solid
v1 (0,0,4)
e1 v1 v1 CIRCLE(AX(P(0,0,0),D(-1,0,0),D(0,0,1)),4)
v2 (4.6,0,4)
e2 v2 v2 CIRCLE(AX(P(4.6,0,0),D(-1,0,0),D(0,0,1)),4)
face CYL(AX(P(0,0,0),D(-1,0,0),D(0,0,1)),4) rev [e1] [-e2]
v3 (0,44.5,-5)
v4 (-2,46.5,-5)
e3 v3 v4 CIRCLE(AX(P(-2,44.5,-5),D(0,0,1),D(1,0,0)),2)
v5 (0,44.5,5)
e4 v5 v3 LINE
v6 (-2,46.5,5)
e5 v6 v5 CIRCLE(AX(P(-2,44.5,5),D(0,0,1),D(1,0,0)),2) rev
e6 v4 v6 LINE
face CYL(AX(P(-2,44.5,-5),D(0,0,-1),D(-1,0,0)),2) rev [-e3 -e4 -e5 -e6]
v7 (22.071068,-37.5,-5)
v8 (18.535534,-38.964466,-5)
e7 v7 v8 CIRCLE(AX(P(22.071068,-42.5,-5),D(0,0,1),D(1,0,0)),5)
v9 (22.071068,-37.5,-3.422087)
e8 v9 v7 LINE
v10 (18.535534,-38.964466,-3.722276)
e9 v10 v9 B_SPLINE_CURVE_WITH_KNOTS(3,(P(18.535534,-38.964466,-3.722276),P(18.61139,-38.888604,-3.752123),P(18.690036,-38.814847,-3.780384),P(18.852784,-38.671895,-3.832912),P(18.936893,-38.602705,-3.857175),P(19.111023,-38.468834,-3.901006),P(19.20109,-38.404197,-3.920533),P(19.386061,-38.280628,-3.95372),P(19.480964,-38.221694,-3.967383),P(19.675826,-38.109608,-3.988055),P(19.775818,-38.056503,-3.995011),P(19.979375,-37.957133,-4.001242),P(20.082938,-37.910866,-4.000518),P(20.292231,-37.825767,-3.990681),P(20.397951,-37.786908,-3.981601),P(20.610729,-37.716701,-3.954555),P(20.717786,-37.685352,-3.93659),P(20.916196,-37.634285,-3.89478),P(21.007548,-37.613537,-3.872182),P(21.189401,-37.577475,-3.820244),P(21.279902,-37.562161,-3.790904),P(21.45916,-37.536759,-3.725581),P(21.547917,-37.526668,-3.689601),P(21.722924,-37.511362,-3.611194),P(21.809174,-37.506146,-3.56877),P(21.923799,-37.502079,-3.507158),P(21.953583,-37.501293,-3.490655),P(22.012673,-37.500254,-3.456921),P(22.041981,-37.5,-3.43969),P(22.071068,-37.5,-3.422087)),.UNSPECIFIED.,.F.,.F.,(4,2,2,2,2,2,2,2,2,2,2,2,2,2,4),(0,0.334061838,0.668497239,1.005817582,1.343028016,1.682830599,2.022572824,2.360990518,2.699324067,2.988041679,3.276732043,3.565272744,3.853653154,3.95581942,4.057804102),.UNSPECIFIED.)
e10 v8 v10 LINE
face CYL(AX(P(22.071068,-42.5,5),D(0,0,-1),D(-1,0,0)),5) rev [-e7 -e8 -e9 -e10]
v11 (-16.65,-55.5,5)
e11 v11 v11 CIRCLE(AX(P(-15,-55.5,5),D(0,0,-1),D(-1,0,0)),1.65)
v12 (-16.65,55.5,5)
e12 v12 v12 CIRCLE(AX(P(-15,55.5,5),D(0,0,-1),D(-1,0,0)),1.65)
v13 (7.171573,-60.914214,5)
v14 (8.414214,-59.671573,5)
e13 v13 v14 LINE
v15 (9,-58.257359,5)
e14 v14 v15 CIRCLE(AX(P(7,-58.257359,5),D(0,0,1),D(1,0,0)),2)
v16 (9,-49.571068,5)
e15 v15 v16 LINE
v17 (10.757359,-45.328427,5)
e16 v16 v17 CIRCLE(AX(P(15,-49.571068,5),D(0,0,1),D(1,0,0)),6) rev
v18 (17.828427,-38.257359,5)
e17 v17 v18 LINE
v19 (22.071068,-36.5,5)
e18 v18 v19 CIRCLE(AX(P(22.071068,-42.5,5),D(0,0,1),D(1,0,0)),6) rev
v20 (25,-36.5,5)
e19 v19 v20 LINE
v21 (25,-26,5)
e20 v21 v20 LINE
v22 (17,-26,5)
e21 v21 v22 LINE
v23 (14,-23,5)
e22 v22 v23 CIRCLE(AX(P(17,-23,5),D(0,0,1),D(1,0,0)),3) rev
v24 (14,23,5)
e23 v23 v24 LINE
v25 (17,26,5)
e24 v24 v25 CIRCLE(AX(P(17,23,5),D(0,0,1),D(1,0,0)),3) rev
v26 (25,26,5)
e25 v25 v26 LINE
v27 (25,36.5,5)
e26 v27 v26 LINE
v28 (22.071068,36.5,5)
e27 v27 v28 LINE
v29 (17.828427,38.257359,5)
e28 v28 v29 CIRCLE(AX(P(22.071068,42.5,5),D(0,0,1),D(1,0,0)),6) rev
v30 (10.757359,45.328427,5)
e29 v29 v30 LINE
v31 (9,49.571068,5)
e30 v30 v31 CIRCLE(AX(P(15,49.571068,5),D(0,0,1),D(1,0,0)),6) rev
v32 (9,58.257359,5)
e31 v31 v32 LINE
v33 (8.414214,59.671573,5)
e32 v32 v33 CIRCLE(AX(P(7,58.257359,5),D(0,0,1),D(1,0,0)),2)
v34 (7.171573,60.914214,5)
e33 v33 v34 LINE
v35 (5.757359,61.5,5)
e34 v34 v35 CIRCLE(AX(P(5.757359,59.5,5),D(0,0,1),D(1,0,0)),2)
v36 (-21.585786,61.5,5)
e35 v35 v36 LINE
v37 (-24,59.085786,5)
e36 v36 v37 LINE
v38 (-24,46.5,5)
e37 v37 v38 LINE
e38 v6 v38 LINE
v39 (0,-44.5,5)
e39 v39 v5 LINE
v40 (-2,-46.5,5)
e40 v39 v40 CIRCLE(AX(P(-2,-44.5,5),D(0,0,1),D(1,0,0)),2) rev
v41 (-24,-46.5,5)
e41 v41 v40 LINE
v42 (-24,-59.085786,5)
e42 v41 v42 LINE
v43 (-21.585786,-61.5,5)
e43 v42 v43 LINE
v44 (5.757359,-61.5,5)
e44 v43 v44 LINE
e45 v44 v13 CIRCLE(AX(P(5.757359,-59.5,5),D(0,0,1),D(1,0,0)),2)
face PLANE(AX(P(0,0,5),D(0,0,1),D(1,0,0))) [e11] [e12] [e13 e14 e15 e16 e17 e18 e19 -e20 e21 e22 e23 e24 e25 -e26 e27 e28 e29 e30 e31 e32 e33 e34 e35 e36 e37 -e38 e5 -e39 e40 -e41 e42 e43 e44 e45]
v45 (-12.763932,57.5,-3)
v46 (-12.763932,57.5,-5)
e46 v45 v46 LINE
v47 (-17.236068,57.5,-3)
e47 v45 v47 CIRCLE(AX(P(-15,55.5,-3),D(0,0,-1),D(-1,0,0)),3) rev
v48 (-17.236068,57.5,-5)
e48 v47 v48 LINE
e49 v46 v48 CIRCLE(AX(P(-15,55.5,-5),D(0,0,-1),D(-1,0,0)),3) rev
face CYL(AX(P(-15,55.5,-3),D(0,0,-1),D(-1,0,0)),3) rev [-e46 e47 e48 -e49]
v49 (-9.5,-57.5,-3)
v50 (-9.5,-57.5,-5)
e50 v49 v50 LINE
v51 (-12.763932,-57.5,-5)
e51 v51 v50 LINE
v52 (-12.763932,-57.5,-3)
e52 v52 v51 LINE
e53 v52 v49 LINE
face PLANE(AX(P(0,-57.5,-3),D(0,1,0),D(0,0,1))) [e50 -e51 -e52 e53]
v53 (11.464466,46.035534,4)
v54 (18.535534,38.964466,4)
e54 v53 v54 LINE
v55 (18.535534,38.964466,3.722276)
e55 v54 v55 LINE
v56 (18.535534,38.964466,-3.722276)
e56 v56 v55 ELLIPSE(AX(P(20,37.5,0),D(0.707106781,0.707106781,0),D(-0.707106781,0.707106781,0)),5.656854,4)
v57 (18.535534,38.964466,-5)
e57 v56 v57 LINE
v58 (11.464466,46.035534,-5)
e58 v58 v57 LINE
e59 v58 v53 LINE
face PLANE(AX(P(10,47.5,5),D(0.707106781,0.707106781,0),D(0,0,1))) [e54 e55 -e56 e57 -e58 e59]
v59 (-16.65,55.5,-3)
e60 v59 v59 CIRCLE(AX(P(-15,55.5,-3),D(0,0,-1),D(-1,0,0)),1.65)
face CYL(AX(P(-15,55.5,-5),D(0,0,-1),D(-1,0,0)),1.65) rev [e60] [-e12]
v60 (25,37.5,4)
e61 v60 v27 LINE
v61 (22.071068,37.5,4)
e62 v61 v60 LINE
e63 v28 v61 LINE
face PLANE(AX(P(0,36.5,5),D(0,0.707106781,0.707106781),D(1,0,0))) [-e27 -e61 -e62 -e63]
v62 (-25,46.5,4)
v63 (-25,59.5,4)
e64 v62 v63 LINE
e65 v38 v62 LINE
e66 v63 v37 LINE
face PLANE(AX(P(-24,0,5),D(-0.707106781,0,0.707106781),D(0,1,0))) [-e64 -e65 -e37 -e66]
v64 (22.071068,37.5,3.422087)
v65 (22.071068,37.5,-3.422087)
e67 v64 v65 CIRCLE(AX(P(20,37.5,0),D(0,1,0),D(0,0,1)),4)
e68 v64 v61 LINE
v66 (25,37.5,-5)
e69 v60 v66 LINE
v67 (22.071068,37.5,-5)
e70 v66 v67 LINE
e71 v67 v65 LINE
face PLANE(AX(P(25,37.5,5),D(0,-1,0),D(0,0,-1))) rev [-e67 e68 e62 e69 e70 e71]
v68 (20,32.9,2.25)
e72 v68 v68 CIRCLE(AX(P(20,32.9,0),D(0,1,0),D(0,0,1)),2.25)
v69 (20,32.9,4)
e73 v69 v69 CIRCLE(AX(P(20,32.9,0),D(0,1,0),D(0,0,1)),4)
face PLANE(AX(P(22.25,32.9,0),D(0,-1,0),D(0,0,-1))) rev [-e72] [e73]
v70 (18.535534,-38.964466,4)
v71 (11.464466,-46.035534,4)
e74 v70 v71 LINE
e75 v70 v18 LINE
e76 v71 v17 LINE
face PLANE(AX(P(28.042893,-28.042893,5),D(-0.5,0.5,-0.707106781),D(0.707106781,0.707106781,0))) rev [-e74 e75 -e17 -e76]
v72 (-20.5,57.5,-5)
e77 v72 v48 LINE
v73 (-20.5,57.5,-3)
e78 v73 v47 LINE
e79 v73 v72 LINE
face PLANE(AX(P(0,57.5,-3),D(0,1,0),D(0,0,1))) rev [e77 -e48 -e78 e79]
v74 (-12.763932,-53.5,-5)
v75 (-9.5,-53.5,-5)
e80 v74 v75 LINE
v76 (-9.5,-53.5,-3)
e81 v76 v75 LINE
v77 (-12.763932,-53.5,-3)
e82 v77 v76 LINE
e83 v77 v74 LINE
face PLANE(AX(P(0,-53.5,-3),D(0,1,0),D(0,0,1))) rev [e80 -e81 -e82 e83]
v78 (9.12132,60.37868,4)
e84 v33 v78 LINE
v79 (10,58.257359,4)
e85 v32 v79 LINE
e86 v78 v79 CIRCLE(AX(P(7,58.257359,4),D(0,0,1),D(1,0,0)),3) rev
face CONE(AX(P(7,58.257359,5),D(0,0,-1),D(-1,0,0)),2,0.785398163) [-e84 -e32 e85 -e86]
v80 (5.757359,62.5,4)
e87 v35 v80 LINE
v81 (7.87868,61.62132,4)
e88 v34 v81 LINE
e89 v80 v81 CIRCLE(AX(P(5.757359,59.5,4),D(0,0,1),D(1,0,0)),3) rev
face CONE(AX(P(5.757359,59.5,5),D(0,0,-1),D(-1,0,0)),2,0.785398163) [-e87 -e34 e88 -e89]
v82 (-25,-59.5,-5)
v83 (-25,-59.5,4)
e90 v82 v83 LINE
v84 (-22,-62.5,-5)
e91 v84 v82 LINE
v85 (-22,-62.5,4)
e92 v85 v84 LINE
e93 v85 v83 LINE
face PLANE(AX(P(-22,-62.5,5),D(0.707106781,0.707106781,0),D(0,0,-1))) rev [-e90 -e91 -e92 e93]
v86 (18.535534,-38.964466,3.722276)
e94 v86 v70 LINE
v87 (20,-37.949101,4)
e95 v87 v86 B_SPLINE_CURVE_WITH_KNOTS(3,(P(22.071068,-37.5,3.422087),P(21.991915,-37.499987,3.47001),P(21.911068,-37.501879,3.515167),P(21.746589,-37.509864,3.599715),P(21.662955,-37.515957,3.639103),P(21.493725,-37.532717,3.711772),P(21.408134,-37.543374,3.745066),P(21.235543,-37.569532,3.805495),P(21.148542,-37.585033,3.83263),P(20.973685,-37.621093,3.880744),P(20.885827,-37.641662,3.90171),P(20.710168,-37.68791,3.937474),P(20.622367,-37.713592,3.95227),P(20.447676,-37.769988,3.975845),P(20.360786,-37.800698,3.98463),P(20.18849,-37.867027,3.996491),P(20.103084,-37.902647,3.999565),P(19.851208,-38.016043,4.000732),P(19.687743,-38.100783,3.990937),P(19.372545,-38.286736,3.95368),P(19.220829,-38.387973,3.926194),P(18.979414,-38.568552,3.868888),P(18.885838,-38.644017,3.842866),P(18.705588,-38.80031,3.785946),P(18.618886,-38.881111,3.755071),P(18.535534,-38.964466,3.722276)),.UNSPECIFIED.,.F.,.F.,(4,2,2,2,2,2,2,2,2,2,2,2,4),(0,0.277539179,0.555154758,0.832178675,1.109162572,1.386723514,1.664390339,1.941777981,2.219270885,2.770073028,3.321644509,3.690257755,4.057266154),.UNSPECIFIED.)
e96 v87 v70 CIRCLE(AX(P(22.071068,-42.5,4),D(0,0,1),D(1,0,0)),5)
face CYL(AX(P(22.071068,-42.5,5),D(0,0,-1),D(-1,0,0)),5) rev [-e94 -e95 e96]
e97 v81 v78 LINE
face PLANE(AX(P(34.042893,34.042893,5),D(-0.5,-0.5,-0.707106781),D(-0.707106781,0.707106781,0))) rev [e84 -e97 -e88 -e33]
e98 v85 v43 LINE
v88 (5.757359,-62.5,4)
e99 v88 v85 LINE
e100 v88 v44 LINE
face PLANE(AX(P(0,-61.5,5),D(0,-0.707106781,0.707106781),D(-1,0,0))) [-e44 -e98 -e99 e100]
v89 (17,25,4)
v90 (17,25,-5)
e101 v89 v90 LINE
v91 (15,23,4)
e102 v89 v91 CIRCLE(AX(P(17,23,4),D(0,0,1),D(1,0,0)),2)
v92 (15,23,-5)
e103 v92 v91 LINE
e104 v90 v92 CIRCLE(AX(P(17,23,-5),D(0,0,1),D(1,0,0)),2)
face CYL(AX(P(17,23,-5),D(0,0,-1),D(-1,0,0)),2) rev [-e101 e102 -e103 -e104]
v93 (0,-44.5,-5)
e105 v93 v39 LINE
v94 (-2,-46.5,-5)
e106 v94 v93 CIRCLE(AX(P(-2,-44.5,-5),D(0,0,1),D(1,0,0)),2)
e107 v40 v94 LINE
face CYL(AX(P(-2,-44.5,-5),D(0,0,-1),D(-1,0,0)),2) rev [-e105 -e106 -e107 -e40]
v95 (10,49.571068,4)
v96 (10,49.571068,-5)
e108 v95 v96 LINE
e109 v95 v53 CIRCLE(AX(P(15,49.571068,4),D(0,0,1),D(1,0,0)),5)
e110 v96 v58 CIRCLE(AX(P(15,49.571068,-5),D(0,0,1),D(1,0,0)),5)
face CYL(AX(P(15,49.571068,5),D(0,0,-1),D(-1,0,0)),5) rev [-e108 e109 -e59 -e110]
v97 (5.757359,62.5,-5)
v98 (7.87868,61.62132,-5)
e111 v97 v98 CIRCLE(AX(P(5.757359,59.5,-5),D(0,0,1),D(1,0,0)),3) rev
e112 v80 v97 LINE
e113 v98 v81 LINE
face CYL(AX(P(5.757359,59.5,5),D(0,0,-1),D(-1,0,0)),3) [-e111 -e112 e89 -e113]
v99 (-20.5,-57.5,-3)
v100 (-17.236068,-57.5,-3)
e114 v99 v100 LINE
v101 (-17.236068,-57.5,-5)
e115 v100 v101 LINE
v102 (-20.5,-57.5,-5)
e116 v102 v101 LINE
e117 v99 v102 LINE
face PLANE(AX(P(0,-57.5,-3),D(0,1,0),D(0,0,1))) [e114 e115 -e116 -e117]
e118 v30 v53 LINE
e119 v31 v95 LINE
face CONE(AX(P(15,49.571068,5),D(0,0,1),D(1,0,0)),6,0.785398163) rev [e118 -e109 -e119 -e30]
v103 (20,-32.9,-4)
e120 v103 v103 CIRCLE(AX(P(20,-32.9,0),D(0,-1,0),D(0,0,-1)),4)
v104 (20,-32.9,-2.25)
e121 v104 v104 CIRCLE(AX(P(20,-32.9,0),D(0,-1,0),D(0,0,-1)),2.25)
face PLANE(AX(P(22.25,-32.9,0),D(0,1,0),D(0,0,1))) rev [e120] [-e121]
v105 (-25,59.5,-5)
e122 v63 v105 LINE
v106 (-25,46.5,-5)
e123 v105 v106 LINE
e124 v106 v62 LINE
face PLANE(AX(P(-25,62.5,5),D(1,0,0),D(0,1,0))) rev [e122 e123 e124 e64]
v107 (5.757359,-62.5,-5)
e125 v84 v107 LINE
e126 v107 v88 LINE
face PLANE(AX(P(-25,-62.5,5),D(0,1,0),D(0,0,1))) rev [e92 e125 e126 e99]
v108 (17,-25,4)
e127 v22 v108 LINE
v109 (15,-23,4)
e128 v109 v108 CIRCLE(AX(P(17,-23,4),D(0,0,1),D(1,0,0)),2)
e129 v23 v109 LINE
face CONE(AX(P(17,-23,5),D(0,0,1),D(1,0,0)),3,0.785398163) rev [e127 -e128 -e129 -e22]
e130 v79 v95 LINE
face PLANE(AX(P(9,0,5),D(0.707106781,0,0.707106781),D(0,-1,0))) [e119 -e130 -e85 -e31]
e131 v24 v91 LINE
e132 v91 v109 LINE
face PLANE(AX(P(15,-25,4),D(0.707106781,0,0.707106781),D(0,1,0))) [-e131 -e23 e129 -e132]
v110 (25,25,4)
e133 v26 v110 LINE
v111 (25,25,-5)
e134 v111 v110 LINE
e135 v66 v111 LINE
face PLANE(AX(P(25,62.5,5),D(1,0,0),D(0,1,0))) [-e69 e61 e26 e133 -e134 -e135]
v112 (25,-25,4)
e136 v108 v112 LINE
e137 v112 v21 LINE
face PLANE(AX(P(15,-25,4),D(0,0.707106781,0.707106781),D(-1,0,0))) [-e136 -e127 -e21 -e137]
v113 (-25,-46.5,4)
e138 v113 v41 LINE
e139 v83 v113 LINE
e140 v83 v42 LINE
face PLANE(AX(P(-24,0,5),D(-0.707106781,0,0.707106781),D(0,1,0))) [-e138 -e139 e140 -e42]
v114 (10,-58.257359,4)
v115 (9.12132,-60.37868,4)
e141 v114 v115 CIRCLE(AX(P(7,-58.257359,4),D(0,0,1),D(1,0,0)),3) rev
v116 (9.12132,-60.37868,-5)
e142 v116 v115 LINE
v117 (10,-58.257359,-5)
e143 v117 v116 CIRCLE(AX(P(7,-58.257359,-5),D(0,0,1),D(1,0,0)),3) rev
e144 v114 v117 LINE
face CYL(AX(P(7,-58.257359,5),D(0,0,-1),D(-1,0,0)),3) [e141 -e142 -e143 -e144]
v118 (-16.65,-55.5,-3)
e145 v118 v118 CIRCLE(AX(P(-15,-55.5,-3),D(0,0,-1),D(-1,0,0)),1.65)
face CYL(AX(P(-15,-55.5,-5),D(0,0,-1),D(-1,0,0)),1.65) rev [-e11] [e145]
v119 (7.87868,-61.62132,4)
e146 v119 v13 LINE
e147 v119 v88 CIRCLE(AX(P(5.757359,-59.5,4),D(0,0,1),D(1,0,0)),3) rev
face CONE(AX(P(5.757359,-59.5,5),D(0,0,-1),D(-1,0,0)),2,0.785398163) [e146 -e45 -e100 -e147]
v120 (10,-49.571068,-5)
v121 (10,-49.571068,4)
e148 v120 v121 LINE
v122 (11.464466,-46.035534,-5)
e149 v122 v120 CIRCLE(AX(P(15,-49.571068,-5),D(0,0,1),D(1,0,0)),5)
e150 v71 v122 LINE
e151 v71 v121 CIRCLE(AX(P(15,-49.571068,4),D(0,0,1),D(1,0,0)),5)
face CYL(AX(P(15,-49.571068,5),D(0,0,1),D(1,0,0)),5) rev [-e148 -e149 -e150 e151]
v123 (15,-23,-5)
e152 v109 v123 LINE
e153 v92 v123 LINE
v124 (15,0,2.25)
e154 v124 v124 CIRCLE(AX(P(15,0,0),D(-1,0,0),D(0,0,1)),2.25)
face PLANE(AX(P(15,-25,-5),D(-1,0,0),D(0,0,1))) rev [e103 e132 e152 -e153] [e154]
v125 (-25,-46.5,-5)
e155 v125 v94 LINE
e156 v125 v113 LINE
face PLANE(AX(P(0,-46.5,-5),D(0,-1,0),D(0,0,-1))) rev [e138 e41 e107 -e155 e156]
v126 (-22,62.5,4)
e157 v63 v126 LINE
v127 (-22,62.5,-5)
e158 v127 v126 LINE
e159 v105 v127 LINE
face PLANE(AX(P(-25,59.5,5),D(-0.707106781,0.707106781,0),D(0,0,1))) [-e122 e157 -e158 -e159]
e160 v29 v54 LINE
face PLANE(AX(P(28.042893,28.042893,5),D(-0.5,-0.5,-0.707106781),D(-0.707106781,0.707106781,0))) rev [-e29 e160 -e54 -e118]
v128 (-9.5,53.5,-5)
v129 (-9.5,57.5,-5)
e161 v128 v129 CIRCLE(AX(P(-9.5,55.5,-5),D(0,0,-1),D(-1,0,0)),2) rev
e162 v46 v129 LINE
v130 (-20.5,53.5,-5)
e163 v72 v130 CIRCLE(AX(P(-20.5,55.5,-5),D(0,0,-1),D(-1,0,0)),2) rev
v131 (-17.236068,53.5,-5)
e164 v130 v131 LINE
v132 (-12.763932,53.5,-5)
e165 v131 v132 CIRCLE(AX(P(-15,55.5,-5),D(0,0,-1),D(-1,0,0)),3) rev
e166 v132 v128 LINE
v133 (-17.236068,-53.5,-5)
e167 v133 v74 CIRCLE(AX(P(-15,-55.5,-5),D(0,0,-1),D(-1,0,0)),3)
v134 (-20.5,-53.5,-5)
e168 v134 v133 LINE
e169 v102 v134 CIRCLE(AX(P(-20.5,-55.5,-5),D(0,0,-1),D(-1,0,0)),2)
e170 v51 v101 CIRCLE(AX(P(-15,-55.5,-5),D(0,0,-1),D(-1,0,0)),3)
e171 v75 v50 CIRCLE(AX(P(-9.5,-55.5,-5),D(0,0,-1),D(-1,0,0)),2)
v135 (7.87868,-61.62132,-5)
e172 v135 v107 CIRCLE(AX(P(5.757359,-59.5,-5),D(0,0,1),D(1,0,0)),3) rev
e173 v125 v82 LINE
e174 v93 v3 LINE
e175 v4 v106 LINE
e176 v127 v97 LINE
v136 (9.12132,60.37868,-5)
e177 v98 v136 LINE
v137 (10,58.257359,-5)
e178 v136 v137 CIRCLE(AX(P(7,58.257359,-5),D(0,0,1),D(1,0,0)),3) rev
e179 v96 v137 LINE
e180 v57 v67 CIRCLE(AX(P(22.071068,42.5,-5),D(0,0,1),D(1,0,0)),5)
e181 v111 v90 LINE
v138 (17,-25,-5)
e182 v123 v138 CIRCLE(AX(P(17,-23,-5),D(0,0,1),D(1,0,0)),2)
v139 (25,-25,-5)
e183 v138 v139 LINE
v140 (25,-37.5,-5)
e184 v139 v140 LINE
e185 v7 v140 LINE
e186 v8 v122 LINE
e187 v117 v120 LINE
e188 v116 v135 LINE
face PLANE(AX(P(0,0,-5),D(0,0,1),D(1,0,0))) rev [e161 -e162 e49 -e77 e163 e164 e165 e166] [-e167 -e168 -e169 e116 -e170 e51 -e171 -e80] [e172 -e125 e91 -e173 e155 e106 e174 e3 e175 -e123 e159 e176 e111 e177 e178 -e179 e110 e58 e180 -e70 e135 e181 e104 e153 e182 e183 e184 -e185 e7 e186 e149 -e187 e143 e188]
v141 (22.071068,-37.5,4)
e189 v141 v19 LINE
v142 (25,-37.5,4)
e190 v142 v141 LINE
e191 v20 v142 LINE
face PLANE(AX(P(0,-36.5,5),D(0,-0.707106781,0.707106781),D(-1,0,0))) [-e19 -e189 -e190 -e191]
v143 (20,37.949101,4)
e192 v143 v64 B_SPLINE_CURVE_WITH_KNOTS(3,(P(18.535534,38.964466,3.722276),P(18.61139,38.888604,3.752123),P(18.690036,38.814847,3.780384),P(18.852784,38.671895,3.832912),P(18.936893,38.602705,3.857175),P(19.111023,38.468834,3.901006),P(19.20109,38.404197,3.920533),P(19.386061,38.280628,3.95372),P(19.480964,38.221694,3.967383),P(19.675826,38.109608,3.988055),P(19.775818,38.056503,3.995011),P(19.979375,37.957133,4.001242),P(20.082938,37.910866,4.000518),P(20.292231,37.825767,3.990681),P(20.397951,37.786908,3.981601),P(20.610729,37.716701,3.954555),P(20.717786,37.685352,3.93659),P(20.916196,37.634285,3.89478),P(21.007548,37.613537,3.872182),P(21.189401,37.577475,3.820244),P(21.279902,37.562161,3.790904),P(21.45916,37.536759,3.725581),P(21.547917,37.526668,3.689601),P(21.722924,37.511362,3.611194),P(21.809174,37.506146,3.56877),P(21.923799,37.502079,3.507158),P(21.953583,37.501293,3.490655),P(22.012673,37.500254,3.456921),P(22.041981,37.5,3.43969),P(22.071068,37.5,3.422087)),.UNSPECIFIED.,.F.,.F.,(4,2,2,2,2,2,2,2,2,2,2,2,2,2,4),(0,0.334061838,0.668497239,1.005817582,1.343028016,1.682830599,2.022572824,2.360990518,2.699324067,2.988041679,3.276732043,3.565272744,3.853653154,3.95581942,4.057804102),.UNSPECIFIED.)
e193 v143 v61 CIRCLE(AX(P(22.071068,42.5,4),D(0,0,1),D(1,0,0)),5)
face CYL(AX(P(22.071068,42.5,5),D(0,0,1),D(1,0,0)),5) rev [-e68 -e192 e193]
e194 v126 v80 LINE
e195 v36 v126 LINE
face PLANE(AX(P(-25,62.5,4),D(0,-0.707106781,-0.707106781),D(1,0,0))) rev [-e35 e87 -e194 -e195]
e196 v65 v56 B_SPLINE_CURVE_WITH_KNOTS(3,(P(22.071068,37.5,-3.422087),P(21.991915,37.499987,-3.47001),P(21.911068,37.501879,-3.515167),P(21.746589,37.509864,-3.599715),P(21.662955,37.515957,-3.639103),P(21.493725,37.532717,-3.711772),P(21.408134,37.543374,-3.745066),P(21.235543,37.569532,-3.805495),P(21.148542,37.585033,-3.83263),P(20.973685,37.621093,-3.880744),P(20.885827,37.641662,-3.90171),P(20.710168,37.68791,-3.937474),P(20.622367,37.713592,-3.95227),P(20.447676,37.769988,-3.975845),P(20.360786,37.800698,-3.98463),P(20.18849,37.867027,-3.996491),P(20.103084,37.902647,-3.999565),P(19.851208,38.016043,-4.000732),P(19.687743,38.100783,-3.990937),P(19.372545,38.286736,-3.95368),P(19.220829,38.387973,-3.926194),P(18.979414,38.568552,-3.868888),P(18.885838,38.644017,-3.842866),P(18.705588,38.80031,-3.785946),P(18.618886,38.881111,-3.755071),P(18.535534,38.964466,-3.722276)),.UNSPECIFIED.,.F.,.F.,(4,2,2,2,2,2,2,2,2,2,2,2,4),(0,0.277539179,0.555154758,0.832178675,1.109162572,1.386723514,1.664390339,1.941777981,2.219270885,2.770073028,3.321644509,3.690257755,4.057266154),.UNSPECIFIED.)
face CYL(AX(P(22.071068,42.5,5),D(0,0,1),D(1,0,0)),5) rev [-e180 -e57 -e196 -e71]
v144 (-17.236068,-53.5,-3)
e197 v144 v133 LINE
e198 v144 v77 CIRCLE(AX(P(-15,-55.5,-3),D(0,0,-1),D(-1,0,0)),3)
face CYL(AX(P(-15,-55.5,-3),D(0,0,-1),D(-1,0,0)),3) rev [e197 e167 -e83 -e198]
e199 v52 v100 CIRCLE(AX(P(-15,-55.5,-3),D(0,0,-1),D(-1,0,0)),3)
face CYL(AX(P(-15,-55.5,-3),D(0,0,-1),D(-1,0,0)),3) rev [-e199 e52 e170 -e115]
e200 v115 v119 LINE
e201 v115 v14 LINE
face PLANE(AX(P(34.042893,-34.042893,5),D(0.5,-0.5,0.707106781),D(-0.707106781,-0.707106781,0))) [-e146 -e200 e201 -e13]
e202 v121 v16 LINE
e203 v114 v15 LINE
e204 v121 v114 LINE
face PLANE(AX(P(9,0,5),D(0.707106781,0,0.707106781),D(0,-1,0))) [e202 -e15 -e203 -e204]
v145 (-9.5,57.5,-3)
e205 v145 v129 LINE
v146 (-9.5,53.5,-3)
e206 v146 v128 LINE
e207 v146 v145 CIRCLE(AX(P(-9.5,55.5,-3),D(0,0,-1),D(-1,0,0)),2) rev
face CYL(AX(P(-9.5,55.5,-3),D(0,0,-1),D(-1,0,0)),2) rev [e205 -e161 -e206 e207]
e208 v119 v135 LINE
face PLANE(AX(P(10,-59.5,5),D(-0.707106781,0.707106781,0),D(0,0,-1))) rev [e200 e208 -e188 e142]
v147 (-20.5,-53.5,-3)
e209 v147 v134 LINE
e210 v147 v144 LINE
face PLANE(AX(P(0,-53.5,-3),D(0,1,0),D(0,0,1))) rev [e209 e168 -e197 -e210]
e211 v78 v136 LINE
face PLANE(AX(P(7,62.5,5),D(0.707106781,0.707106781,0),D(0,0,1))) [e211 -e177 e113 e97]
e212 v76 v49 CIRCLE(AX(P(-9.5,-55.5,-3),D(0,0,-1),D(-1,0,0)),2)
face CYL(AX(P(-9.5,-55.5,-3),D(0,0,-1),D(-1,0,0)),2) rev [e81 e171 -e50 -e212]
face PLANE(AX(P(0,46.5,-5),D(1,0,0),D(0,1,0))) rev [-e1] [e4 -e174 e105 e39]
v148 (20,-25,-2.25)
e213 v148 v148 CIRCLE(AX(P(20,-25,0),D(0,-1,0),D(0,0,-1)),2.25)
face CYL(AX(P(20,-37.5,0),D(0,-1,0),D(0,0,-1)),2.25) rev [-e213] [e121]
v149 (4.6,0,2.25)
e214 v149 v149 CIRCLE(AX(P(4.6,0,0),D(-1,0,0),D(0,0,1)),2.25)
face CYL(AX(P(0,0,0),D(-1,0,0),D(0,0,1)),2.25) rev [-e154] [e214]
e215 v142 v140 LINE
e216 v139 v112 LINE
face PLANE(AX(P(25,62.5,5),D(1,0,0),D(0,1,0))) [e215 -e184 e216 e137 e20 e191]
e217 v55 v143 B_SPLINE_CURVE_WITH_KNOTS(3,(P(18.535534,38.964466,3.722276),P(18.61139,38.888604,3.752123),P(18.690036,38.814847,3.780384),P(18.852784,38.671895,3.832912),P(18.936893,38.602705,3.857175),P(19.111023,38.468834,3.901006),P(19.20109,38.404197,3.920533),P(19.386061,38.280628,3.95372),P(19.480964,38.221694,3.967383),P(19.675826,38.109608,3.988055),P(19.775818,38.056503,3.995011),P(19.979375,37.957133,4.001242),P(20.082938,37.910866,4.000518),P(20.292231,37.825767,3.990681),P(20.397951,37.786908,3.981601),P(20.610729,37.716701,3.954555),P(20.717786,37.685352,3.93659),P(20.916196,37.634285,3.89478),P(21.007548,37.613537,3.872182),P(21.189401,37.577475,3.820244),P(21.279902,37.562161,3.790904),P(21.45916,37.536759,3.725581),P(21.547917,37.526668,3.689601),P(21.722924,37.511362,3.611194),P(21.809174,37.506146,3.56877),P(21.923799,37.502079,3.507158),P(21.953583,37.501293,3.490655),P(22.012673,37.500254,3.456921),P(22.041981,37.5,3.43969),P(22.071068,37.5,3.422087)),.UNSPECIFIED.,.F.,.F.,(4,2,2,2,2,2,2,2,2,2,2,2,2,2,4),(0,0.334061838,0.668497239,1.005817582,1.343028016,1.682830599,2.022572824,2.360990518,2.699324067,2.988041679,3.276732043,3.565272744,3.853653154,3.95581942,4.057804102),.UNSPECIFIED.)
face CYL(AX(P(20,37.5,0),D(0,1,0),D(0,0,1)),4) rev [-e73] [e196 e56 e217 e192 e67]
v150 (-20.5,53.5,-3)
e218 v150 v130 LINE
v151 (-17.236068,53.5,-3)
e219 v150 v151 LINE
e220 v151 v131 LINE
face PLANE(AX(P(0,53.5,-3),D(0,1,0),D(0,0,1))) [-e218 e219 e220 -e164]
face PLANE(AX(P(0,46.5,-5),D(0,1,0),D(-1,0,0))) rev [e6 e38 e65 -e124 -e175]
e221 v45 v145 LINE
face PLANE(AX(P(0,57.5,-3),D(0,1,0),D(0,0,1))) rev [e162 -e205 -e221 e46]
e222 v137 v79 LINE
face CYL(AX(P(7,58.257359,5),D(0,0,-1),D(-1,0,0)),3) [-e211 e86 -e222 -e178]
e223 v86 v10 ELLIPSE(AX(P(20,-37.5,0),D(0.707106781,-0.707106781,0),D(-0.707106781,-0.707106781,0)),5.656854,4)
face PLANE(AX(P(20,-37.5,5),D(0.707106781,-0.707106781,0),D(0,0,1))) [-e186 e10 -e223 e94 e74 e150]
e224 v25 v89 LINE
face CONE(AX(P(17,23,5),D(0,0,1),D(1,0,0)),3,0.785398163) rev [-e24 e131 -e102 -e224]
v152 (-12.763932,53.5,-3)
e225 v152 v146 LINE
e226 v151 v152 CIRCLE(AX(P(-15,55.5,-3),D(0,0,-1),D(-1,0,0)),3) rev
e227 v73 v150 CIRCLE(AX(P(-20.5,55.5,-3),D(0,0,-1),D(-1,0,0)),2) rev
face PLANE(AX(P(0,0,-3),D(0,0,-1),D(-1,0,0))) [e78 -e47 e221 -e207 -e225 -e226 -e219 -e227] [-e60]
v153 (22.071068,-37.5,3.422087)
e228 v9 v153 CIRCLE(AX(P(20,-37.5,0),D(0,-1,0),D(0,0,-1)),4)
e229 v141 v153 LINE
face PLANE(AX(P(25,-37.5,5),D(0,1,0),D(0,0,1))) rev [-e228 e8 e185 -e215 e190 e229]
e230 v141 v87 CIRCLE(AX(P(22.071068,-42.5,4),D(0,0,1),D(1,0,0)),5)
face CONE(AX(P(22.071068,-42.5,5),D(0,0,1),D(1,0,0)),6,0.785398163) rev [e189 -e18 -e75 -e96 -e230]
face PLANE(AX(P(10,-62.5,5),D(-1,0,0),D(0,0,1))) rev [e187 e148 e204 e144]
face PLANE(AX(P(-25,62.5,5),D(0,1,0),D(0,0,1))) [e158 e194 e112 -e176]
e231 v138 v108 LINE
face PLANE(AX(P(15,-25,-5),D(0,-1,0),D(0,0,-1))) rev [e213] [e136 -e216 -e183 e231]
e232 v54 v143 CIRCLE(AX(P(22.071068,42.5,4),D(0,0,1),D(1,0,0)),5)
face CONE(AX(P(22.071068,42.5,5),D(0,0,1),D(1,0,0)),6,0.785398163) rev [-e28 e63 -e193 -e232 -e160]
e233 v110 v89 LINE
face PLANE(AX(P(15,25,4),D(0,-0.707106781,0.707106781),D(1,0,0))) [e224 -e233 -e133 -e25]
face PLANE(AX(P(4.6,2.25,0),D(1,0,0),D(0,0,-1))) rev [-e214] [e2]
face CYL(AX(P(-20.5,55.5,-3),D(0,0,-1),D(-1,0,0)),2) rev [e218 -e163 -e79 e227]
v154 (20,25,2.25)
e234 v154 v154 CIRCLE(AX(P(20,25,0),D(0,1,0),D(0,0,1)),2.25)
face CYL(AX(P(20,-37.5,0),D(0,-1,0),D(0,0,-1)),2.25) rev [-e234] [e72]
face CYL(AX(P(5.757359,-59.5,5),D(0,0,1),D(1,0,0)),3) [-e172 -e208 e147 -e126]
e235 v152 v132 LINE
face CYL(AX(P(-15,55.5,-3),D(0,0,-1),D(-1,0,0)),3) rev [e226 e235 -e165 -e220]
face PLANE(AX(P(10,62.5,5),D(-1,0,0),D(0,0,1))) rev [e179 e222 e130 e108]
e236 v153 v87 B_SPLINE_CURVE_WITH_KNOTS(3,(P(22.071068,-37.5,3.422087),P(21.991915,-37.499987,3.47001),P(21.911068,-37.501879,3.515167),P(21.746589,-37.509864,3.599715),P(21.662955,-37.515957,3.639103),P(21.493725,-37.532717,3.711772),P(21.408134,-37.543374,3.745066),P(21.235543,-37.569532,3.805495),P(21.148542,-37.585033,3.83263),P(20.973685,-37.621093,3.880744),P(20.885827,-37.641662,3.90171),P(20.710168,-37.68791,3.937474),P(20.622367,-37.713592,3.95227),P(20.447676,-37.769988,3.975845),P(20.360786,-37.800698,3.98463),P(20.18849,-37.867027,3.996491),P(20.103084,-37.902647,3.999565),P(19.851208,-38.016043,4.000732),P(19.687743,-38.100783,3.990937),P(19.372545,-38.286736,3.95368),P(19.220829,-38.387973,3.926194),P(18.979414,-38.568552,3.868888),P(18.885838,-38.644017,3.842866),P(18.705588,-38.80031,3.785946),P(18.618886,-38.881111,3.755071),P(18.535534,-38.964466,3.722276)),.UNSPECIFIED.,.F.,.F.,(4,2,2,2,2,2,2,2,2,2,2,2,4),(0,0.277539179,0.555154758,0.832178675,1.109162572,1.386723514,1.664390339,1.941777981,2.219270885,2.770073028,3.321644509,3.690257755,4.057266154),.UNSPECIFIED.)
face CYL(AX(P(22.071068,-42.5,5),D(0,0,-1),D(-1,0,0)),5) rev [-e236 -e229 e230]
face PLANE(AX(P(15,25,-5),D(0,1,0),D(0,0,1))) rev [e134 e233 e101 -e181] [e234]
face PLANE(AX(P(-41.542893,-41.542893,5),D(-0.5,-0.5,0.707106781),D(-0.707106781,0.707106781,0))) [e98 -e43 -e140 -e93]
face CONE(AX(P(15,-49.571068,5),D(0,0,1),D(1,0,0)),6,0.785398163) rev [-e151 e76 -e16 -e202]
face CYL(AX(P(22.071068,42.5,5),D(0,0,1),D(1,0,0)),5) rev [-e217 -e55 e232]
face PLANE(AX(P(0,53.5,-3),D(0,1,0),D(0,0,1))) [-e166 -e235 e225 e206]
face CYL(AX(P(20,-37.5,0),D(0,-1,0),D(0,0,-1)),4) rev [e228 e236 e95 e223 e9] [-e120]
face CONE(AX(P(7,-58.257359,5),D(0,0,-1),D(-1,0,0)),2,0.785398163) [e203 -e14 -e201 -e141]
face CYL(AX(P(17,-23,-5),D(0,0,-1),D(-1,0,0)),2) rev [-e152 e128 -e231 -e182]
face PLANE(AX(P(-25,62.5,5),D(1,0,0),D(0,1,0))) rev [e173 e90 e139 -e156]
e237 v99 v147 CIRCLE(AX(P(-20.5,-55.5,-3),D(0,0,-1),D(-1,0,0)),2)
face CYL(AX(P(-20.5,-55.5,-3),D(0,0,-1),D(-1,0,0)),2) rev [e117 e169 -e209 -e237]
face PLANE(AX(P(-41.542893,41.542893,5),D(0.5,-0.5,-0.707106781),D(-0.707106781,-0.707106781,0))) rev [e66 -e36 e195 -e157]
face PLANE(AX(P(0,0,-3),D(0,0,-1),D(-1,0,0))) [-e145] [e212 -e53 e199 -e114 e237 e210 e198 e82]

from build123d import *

# Parameters (mm, degrees)
SKETCH1_W                                            = 50
SKETCH1_H                                            = 125
BOSS_EXTRUDE1_DEPTH                                  = 5
SKETCH2_W                                            = 25
SKETCH2_H                                            = 93
CUT_EXTRUDE1_DEPTH                                   = 69.053287944
SKETCH3_W                                            = 10
SKETCH3_H                                            = 50
CUT_EXTRUDE2_DEPTH                                   = 69.053287944
CUT_EXTRUDE3_DEPTH                                   = 2
M4_TAPPED_HOLE1_D                                    = 3.3
SKETCH7_W                                            = 15
SKETCH7_H                                            = 25
CUT_EXTRUDE4_DEPTH                                   = 69.053287944
CBORE_FOR_M4_SLOTTED_CHEESE_HEAD_SCREWS2_D           = 4.5
CBORE_FOR_M4_SLOTTED_CHEESE_HEAD_SCREWS2_CBORE_D     = 8
CBORE_FOR_M4_SLOTTED_CHEESE_HEAD_SCREWS2_CBORE_DEPTH = 4.6
CBORE_FOR_M4_SLOTTED_CHEESE_HEAD_SCREWS3_D           = 4.5
CBORE_FOR_M4_SLOTTED_CHEESE_HEAD_SCREWS3_CBORE_D     = 8
CBORE_FOR_M4_SLOTTED_CHEESE_HEAD_SCREWS3_CBORE_DEPTH = 4.6
CHAMFER1_SIZE                                        = 10
FILLET1_R                                            = 5
FILLET2_R                                            = 2
CHAMFER2_SIZE                                        = 3
FILLET3_R                                            = 3
CHAMFER3_SIZE                                        = 1


# Some blends are built 0.0001 mm under size
with BuildPart() as part:
    # Sketch1 → Boss-Extrude1 (new, symmetric)
    with BuildSketch(Plane.XY):
        Rectangle(SKETCH1_W, SKETCH1_H)
    extrude(amount=BOSS_EXTRUDE1_DEPTH, both=True)

    # Sketch2 → Cut-Extrude1 (cut, through all)
    with BuildSketch(Plane.XY.offset(5)):
        with Locations((-12.5, 0)):
            Rectangle(SKETCH2_W, SKETCH2_H)
    extrude(amount=-CUT_EXTRUDE1_DEPTH, mode=Mode.SUBTRACT)

    # Sketch3 → Cut-Extrude2 (cut, through all)
    with BuildSketch(Plane.XY.offset(5)):
        with Locations((20, 0)):
            Rectangle(SKETCH3_W, SKETCH3_H)
    extrude(amount=-CUT_EXTRUDE2_DEPTH, mode=Mode.SUBTRACT)

    # Sketch4 → Cut-Extrude3 (cut)
    with BuildSketch(Plane(origin=(0, 0, -5), x_dir=(-1, 0, 0), z_dir=(0, 0, -1))):
        with BuildLine():
            Line((9.5, -57.5), (12.763932023, -57.5))
            ThreePointArc((12.763932023, -57.5), (12, -55.5), (12.763932023, -53.5))
            Line((12.763932023, -53.5), (9.5, -53.5))
            ThreePointArc((9.5, -53.5), (7.5, -55.5), (9.5, -57.5))
        make_face()
        with BuildLine():
            Line((12.763932023, -57.5), (17.236067977, -57.5))
            ThreePointArc((17.236067977, -57.5), (17.802517077, -56.570466269), (18, -55.5))
            ThreePointArc((18, -55.5), (17.802517077, -54.429533731), (17.236067977, -53.5))
            Line((17.236067977, -53.5), (12.763932023, -53.5))
            ThreePointArc((12.763932023, -53.5), (12, -55.5), (12.763932023, -57.5))
        make_face()
        with BuildLine():
            Line((12.763932023, -53.5), (17.236067977, -53.5))
            ThreePointArc((17.236067977, -53.5), (15, -52.5), (12.763932023, -53.5))
        make_face()
        with BuildLine():
            Line((17.236067977, -57.5), (20.5, -57.5))
            ThreePointArc((20.5, -57.5), (22.5, -55.5), (20.5, -53.5))
            Line((20.5, -53.5), (17.236067977, -53.5))
            ThreePointArc((17.236067977, -53.5), (17.802517077, -54.429533731), (18, -55.5))
            ThreePointArc((18, -55.5), (17.802517077, -56.570466269), (17.236067977, -57.5))
        make_face()
        with BuildLine():
            ThreePointArc((12.763932023, -57.5), (15, -58.5), (17.236067977, -57.5))
            Line((17.236067977, -57.5), (12.763932023, -57.5))
        make_face()
        with BuildLine():
            ThreePointArc((12.763932023, 53.5), (12, 55.5), (12.763932023, 57.5))
            Line((12.763932023, 57.5), (9.5, 57.5))
            ThreePointArc((9.5, 57.5), (7.5, 55.5), (9.5, 53.5))
            Line((9.5, 53.5), (12.763932023, 53.5))
        make_face()
        with BuildLine():
            Line((12.763932023, 57.5), (17.236067977, 57.5))
            ThreePointArc((17.236067977, 57.5), (15, 58.5), (12.763932023, 57.5))
        make_face()
        with BuildLine():
            ThreePointArc((18, 55.5), (17.802517077, 56.570466269), (17.236067977, 57.5))
            Line((17.236067977, 57.5), (12.763932023, 57.5))
            ThreePointArc((12.763932023, 57.5), (12, 55.5), (12.763932023, 53.5))
            Line((12.763932023, 53.5), (17.236067977, 53.5))
            ThreePointArc((17.236067977, 53.5), (17.802517077, 54.429533731), (18, 55.5))
        make_face()
        with BuildLine():
            ThreePointArc((20.5, 53.5), (22.5, 55.5), (20.5, 57.5))
            Line((20.5, 57.5), (17.236067977, 57.5))
            ThreePointArc((17.236067977, 57.5), (17.802517077, 56.570466269), (18, 55.5))
            ThreePointArc((18, 55.5), (17.802517077, 54.429533731), (17.236067977, 53.5))
            Line((17.236067977, 53.5), (20.5, 53.5))
        make_face()
        with BuildLine():
            ThreePointArc((12.763932023, 53.5), (15, 52.5), (17.236067977, 53.5))
            Line((17.236067977, 53.5), (12.763932023, 53.5))
        make_face()
    extrude(amount=-CUT_EXTRUDE3_DEPTH, mode=Mode.SUBTRACT)

    # M4 Tapped Hole1 (through all)
    with Locations(Plane(origin=(0, 0, -5), x_dir=(-1, 0, 0), z_dir=(0, 0, -1))):
        with Locations((15, -55.5), (15, 55.5)):
            Hole(M4_TAPPED_HOLE1_D / 2)

    # Sketch7 → Cut-Extrude4 (cut, through all)
    with BuildSketch(Plane(origin=(0, 0, -5), x_dir=(-1, 0, 0), z_dir=(0, 0, -1))):
        with Locations((-17.5, -50)):
            Rectangle(SKETCH7_W, SKETCH7_H)
        with Locations((-17.5, 50)):
            Rectangle(SKETCH7_W, SKETCH7_H)
    extrude(amount=-CUT_EXTRUDE4_DEPTH, mode=Mode.SUBTRACT)

    # CBORE for M4 Slotted cheese head screws2 (through all)
    with Locations(Plane(origin=(0, -37.5, 0), x_dir=(-1, 0, 0), z_dir=(0, -1, 0))):
        with Locations((-20, 0)):
            cbore_for_m4_slotted_cheese_head_screws2 = CounterBoreHole(CBORE_FOR_M4_SLOTTED_CHEESE_HEAD_SCREWS2_D / 2, CBORE_FOR_M4_SLOTTED_CHEESE_HEAD_SCREWS2_CBORE_D / 2, CBORE_FOR_M4_SLOTTED_CHEESE_HEAD_SCREWS2_CBORE_DEPTH)

    # CBORE for M4 Slotted cheese head screws3 (through all)
    with Locations(Plane.ZY):
        with Locations((0, 0)):
            CounterBoreHole(CBORE_FOR_M4_SLOTTED_CHEESE_HEAD_SCREWS3_D / 2, CBORE_FOR_M4_SLOTTED_CHEESE_HEAD_SCREWS3_CBORE_D / 2, CBORE_FOR_M4_SLOTTED_CHEESE_HEAD_SCREWS3_CBORE_DEPTH)

    # Mirror1: CBORE for M4 Slotted cheese head screws2 across plane
    add(cbore_for_m4_slotted_cheese_head_screws2.mirror(Plane.ZX), mode=Mode.SUBTRACT)

    # Chamfer1
    # the kernel refuses this chamfer: 10 mm, written as the material it adds along each edge
    with BuildSketch(Plane(origin=(10, -37.5, -5), x_dir=(-0.027495876610586317, -0.9996219169112968, 0), z_dir=(0, 0, 1))) as chamfer1_piece_1_section:
        Polygon((CHAMFER1_SIZE * 0.999621916911, CHAMFER1_SIZE * 0.0274958766106), (-CHAMFER1_SIZE * 0.0274958766106, CHAMFER1_SIZE * 0.999621916911), (0, 0), align=None)
    chamfer1_piece_1 = extrude(amount=10, mode=Mode.PRIVATE)
    chamfer1_piece_1 = chamfer1_piece_1 - Plane(origin=(20, -41.045650517, 0), x_dir=(-1, 0, 0), z_dir=(0, -1, 0)) * Cylinder(4, 60, mode=Mode.PRIVATE)
    add(chamfer1_piece_1)
    with BuildSketch(Plane(origin=(10, 37.5, -5), x_dir=(-0.027495876610586317, 0.9996219169112968, 0), z_dir=(0, 0, 1))) as chamfer1_piece_2_section:
        Polygon((CHAMFER1_SIZE * 0.999621916911, -CHAMFER1_SIZE * 0.0274958766106), (-CHAMFER1_SIZE * 0.0274958766106, -CHAMFER1_SIZE * 0.999621916911), (0, 0), align=None)
    chamfer1_piece_2 = extrude(amount=10, mode=Mode.PRIVATE)
    chamfer1_piece_2 = chamfer1_piece_2 - Plane(origin=(20, 41.045650517, 0), x_dir=(-1, 0, 0), z_dir=(0, 1, 0)) * Cylinder(4, 60, mode=Mode.PRIVATE)
    add(chamfer1_piece_2)

    # Fillet1
    # the kernel refuses this fillet: 5 mm, written as the material it adds along each edge
    with BuildSketch(Plane(origin=(10, -47.5, -5), x_dir=(0.707106781186831, 0.707106781186264, 0), z_dir=(0, 0, 1))) as fillet1_piece_1:
        with BuildLine():
            CenterArc((FILLET1_R * 0.414213562373, -FILLET1_R), FILLET1_R, 90, 45)
            Line((-FILLET1_R * 0.292893218814, -FILLET1_R * 0.292893218814), (0, 0))
            Line((0, 0), (FILLET1_R * 0.414213562373, 0))
        make_face()
    extrude(amount=10)
    with BuildSketch(Plane(origin=(20, -37.5, -5), x_dir=(-0.7071067811868298, -0.7071067811862654, 0), z_dir=(0, 0, 1))) as fillet1_piece_2_section:
        with BuildLine():
            CenterArc((FILLET1_R * 0.414213562373, FILLET1_R), FILLET1_R, 225, 45)
            Line((-FILLET1_R * 0.292893218813, FILLET1_R * 0.292893218813), (0, 0))
            Line((0, 0), (FILLET1_R * 0.414213562373, 0))
        make_face()
    fillet1_piece_2 = extrude(amount=6.17766953, mode=Mode.PRIVATE)
    fillet1_piece_2 = fillet1_piece_2 - Plane(origin=(20, -37.809724496, 0), x_dir=(-1, 0, 0), z_dir=(0, -1, 0)) * Cylinder(4, 21, mode=Mode.PRIVATE)
    add(fillet1_piece_2)
    with BuildSketch(Plane(origin=(10, 47.5, -5), x_dir=(0.707106781186831, -0.707106781186264, 0), z_dir=(0, 0, 1))) as fillet1_piece_3:
        with BuildLine():
            CenterArc((FILLET1_R * 0.414213562373, FILLET1_R), FILLET1_R, 225, 45)
            Line((-FILLET1_R * 0.292893218814, FILLET1_R * 0.292893218814), (0, 0))
            Line((0, 0), (FILLET1_R * 0.414213562373, 0))
        make_face()
    extrude(amount=10)
    with BuildSketch(Plane(origin=(20, 37.5, -5), x_dir=(-0.7071067811868298, 0.7071067811862654, 0), z_dir=(0, 0, 1))) as fillet1_piece_4_section:
        with BuildLine():
            CenterArc((FILLET1_R * 0.414213562373, -FILLET1_R), FILLET1_R, 90, 45)
            Line((-FILLET1_R * 0.292893218813, -FILLET1_R * 0.292893218813), (0, 0))
            Line((0, 0), (FILLET1_R * 0.414213562373, 0))
        make_face()
    fillet1_piece_4 = extrude(amount=6.17766953, mode=Mode.PRIVATE)
    fillet1_piece_4 = fillet1_piece_4 - Plane(origin=(20, 37.8097245, 0), x_dir=(-1, 0, 0), z_dir=(0, 1, 0)) * Cylinder(4, 21, mode=Mode.PRIVATE)
    add(fillet1_piece_4)
    with BuildSketch(Plane(origin=(20, -37.5, -1.17766953), x_dir=(-0.7071067811868306, -0.7071067811862645, 0), z_dir=(0, 0, 1))) as fillet1_piece_5_section:
        with BuildLine():
            CenterArc((FILLET1_R * 0.414213562373, FILLET1_R), FILLET1_R, 225, 45)
            Line((-FILLET1_R * 0.292893218813, FILLET1_R * 0.292893218813), (0, 0))
            Line((0, 0), (FILLET1_R * 0.414213562373, 0))
        make_face()
    fillet1_piece_5 = extrude(amount=6.17766953, mode=Mode.PRIVATE)
    fillet1_piece_5 = fillet1_piece_5 - Plane(origin=(20, -37.8097245, 0), x_dir=(-1, 0, 0), z_dir=(0, -1, 0)) * Cylinder(4, 21, mode=Mode.PRIVATE)
    add(fillet1_piece_5)
    with BuildSketch(Plane(origin=(20, 37.5, -1.17766953), x_dir=(-0.7071067811868306, 0.7071067811862645, 0), z_dir=(0, 0, 1))) as fillet1_piece_6_section:
        with BuildLine():
            CenterArc((FILLET1_R * 0.414213562373, -FILLET1_R), FILLET1_R, 90, 45)
            Line((-FILLET1_R * 0.292893218813, -FILLET1_R * 0.292893218813), (0, 0))
            Line((0, 0), (FILLET1_R * 0.414213562373, 0))
        make_face()
    fillet1_piece_6 = extrude(amount=6.17766953, mode=Mode.PRIVATE)
    fillet1_piece_6 = fillet1_piece_6 - Plane(origin=(20, 37.809724496, 0), x_dir=(-1, 0, 0), z_dir=(0, 1, 0)) * Cylinder(4, 21, mode=Mode.PRIVATE)
    add(fillet1_piece_6)

    # Fillet2
    fillet2_edges = [part.edges().sort_by_distance(p)[0] for p in [
        (0, 46.5, 0),
        (0, -46.5, 0),
        (15, -25, 0),
        (15, 25, 0),
    ]]
    fillet(fillet2_edges, radius=FILLET2_R)

    # Chamfer2
    chamfer2_edges = [part.edges().sort_by_distance(p)[0] for p in [
        (10, -62.5, 0),
        (10, 62.5, 0),
        (-25, 62.5, 0),
        (-25, -62.5, 0),
    ]]
    chamfer(chamfer2_edges, length=CHAMFER2_SIZE)

    # Fillet3
    fillet3_edges = [part.edges().sort_by_distance(p)[0] for p in [
        (7, -62.5, 0),
        (7, 62.5, 0),
        (10, -59.5, 0),
        (10, 59.5, 0),
    ]]
    fillet(fillet3_edges, radius=FILLET3_R)

    # Chamfer3
    chamfer3_edges = [part.edges().sort_by_distance(p)[0] for p in [
        (23.535533906, 37.5, 5),
        (-25, -53, 5),
        (15, -42.5, 5),
        (23.535533906, -37.5, 5),
        (10, 53.914213562, 5),
        (15, 42.5, 5),
        (10.380602337, -47.65765065, 5),
        (20.15765065, -37.880602337, 5),
        (10.380602337, 47.65765065, 5),
        (20.15765065, 37.880602337, 5),
        (15, 0, 5),
        (21, -25, 5),
        (15.585786438, 24.414213562, 5),
        (15.585786438, -24.414213562, 5),
        (-8.121320344, -62.5, 5),
        (-8.121320344, 62.5, 5),
        (-25, 53, 5),
        (-23.5, 61, 5),
        (-23.5, -61, 5),
        (8.5, 61, 5),
        (8.5, -61, 5),
        (10, -53.914213562, 5),
        (6.90540961, -62.271638598, 5),
        (9.771638598, -59.40540961, 5),
        (9.771638598, 59.40540961, 5),
        (6.90540961, 62.271638598, 5),
        (21, 25, 5),
    ]]
    chamfer(chamfer3_edges, length=CHAMFER3_SIZE - 0.0001)  # a hair under: the kernel refuses the full size


solid = part.part
